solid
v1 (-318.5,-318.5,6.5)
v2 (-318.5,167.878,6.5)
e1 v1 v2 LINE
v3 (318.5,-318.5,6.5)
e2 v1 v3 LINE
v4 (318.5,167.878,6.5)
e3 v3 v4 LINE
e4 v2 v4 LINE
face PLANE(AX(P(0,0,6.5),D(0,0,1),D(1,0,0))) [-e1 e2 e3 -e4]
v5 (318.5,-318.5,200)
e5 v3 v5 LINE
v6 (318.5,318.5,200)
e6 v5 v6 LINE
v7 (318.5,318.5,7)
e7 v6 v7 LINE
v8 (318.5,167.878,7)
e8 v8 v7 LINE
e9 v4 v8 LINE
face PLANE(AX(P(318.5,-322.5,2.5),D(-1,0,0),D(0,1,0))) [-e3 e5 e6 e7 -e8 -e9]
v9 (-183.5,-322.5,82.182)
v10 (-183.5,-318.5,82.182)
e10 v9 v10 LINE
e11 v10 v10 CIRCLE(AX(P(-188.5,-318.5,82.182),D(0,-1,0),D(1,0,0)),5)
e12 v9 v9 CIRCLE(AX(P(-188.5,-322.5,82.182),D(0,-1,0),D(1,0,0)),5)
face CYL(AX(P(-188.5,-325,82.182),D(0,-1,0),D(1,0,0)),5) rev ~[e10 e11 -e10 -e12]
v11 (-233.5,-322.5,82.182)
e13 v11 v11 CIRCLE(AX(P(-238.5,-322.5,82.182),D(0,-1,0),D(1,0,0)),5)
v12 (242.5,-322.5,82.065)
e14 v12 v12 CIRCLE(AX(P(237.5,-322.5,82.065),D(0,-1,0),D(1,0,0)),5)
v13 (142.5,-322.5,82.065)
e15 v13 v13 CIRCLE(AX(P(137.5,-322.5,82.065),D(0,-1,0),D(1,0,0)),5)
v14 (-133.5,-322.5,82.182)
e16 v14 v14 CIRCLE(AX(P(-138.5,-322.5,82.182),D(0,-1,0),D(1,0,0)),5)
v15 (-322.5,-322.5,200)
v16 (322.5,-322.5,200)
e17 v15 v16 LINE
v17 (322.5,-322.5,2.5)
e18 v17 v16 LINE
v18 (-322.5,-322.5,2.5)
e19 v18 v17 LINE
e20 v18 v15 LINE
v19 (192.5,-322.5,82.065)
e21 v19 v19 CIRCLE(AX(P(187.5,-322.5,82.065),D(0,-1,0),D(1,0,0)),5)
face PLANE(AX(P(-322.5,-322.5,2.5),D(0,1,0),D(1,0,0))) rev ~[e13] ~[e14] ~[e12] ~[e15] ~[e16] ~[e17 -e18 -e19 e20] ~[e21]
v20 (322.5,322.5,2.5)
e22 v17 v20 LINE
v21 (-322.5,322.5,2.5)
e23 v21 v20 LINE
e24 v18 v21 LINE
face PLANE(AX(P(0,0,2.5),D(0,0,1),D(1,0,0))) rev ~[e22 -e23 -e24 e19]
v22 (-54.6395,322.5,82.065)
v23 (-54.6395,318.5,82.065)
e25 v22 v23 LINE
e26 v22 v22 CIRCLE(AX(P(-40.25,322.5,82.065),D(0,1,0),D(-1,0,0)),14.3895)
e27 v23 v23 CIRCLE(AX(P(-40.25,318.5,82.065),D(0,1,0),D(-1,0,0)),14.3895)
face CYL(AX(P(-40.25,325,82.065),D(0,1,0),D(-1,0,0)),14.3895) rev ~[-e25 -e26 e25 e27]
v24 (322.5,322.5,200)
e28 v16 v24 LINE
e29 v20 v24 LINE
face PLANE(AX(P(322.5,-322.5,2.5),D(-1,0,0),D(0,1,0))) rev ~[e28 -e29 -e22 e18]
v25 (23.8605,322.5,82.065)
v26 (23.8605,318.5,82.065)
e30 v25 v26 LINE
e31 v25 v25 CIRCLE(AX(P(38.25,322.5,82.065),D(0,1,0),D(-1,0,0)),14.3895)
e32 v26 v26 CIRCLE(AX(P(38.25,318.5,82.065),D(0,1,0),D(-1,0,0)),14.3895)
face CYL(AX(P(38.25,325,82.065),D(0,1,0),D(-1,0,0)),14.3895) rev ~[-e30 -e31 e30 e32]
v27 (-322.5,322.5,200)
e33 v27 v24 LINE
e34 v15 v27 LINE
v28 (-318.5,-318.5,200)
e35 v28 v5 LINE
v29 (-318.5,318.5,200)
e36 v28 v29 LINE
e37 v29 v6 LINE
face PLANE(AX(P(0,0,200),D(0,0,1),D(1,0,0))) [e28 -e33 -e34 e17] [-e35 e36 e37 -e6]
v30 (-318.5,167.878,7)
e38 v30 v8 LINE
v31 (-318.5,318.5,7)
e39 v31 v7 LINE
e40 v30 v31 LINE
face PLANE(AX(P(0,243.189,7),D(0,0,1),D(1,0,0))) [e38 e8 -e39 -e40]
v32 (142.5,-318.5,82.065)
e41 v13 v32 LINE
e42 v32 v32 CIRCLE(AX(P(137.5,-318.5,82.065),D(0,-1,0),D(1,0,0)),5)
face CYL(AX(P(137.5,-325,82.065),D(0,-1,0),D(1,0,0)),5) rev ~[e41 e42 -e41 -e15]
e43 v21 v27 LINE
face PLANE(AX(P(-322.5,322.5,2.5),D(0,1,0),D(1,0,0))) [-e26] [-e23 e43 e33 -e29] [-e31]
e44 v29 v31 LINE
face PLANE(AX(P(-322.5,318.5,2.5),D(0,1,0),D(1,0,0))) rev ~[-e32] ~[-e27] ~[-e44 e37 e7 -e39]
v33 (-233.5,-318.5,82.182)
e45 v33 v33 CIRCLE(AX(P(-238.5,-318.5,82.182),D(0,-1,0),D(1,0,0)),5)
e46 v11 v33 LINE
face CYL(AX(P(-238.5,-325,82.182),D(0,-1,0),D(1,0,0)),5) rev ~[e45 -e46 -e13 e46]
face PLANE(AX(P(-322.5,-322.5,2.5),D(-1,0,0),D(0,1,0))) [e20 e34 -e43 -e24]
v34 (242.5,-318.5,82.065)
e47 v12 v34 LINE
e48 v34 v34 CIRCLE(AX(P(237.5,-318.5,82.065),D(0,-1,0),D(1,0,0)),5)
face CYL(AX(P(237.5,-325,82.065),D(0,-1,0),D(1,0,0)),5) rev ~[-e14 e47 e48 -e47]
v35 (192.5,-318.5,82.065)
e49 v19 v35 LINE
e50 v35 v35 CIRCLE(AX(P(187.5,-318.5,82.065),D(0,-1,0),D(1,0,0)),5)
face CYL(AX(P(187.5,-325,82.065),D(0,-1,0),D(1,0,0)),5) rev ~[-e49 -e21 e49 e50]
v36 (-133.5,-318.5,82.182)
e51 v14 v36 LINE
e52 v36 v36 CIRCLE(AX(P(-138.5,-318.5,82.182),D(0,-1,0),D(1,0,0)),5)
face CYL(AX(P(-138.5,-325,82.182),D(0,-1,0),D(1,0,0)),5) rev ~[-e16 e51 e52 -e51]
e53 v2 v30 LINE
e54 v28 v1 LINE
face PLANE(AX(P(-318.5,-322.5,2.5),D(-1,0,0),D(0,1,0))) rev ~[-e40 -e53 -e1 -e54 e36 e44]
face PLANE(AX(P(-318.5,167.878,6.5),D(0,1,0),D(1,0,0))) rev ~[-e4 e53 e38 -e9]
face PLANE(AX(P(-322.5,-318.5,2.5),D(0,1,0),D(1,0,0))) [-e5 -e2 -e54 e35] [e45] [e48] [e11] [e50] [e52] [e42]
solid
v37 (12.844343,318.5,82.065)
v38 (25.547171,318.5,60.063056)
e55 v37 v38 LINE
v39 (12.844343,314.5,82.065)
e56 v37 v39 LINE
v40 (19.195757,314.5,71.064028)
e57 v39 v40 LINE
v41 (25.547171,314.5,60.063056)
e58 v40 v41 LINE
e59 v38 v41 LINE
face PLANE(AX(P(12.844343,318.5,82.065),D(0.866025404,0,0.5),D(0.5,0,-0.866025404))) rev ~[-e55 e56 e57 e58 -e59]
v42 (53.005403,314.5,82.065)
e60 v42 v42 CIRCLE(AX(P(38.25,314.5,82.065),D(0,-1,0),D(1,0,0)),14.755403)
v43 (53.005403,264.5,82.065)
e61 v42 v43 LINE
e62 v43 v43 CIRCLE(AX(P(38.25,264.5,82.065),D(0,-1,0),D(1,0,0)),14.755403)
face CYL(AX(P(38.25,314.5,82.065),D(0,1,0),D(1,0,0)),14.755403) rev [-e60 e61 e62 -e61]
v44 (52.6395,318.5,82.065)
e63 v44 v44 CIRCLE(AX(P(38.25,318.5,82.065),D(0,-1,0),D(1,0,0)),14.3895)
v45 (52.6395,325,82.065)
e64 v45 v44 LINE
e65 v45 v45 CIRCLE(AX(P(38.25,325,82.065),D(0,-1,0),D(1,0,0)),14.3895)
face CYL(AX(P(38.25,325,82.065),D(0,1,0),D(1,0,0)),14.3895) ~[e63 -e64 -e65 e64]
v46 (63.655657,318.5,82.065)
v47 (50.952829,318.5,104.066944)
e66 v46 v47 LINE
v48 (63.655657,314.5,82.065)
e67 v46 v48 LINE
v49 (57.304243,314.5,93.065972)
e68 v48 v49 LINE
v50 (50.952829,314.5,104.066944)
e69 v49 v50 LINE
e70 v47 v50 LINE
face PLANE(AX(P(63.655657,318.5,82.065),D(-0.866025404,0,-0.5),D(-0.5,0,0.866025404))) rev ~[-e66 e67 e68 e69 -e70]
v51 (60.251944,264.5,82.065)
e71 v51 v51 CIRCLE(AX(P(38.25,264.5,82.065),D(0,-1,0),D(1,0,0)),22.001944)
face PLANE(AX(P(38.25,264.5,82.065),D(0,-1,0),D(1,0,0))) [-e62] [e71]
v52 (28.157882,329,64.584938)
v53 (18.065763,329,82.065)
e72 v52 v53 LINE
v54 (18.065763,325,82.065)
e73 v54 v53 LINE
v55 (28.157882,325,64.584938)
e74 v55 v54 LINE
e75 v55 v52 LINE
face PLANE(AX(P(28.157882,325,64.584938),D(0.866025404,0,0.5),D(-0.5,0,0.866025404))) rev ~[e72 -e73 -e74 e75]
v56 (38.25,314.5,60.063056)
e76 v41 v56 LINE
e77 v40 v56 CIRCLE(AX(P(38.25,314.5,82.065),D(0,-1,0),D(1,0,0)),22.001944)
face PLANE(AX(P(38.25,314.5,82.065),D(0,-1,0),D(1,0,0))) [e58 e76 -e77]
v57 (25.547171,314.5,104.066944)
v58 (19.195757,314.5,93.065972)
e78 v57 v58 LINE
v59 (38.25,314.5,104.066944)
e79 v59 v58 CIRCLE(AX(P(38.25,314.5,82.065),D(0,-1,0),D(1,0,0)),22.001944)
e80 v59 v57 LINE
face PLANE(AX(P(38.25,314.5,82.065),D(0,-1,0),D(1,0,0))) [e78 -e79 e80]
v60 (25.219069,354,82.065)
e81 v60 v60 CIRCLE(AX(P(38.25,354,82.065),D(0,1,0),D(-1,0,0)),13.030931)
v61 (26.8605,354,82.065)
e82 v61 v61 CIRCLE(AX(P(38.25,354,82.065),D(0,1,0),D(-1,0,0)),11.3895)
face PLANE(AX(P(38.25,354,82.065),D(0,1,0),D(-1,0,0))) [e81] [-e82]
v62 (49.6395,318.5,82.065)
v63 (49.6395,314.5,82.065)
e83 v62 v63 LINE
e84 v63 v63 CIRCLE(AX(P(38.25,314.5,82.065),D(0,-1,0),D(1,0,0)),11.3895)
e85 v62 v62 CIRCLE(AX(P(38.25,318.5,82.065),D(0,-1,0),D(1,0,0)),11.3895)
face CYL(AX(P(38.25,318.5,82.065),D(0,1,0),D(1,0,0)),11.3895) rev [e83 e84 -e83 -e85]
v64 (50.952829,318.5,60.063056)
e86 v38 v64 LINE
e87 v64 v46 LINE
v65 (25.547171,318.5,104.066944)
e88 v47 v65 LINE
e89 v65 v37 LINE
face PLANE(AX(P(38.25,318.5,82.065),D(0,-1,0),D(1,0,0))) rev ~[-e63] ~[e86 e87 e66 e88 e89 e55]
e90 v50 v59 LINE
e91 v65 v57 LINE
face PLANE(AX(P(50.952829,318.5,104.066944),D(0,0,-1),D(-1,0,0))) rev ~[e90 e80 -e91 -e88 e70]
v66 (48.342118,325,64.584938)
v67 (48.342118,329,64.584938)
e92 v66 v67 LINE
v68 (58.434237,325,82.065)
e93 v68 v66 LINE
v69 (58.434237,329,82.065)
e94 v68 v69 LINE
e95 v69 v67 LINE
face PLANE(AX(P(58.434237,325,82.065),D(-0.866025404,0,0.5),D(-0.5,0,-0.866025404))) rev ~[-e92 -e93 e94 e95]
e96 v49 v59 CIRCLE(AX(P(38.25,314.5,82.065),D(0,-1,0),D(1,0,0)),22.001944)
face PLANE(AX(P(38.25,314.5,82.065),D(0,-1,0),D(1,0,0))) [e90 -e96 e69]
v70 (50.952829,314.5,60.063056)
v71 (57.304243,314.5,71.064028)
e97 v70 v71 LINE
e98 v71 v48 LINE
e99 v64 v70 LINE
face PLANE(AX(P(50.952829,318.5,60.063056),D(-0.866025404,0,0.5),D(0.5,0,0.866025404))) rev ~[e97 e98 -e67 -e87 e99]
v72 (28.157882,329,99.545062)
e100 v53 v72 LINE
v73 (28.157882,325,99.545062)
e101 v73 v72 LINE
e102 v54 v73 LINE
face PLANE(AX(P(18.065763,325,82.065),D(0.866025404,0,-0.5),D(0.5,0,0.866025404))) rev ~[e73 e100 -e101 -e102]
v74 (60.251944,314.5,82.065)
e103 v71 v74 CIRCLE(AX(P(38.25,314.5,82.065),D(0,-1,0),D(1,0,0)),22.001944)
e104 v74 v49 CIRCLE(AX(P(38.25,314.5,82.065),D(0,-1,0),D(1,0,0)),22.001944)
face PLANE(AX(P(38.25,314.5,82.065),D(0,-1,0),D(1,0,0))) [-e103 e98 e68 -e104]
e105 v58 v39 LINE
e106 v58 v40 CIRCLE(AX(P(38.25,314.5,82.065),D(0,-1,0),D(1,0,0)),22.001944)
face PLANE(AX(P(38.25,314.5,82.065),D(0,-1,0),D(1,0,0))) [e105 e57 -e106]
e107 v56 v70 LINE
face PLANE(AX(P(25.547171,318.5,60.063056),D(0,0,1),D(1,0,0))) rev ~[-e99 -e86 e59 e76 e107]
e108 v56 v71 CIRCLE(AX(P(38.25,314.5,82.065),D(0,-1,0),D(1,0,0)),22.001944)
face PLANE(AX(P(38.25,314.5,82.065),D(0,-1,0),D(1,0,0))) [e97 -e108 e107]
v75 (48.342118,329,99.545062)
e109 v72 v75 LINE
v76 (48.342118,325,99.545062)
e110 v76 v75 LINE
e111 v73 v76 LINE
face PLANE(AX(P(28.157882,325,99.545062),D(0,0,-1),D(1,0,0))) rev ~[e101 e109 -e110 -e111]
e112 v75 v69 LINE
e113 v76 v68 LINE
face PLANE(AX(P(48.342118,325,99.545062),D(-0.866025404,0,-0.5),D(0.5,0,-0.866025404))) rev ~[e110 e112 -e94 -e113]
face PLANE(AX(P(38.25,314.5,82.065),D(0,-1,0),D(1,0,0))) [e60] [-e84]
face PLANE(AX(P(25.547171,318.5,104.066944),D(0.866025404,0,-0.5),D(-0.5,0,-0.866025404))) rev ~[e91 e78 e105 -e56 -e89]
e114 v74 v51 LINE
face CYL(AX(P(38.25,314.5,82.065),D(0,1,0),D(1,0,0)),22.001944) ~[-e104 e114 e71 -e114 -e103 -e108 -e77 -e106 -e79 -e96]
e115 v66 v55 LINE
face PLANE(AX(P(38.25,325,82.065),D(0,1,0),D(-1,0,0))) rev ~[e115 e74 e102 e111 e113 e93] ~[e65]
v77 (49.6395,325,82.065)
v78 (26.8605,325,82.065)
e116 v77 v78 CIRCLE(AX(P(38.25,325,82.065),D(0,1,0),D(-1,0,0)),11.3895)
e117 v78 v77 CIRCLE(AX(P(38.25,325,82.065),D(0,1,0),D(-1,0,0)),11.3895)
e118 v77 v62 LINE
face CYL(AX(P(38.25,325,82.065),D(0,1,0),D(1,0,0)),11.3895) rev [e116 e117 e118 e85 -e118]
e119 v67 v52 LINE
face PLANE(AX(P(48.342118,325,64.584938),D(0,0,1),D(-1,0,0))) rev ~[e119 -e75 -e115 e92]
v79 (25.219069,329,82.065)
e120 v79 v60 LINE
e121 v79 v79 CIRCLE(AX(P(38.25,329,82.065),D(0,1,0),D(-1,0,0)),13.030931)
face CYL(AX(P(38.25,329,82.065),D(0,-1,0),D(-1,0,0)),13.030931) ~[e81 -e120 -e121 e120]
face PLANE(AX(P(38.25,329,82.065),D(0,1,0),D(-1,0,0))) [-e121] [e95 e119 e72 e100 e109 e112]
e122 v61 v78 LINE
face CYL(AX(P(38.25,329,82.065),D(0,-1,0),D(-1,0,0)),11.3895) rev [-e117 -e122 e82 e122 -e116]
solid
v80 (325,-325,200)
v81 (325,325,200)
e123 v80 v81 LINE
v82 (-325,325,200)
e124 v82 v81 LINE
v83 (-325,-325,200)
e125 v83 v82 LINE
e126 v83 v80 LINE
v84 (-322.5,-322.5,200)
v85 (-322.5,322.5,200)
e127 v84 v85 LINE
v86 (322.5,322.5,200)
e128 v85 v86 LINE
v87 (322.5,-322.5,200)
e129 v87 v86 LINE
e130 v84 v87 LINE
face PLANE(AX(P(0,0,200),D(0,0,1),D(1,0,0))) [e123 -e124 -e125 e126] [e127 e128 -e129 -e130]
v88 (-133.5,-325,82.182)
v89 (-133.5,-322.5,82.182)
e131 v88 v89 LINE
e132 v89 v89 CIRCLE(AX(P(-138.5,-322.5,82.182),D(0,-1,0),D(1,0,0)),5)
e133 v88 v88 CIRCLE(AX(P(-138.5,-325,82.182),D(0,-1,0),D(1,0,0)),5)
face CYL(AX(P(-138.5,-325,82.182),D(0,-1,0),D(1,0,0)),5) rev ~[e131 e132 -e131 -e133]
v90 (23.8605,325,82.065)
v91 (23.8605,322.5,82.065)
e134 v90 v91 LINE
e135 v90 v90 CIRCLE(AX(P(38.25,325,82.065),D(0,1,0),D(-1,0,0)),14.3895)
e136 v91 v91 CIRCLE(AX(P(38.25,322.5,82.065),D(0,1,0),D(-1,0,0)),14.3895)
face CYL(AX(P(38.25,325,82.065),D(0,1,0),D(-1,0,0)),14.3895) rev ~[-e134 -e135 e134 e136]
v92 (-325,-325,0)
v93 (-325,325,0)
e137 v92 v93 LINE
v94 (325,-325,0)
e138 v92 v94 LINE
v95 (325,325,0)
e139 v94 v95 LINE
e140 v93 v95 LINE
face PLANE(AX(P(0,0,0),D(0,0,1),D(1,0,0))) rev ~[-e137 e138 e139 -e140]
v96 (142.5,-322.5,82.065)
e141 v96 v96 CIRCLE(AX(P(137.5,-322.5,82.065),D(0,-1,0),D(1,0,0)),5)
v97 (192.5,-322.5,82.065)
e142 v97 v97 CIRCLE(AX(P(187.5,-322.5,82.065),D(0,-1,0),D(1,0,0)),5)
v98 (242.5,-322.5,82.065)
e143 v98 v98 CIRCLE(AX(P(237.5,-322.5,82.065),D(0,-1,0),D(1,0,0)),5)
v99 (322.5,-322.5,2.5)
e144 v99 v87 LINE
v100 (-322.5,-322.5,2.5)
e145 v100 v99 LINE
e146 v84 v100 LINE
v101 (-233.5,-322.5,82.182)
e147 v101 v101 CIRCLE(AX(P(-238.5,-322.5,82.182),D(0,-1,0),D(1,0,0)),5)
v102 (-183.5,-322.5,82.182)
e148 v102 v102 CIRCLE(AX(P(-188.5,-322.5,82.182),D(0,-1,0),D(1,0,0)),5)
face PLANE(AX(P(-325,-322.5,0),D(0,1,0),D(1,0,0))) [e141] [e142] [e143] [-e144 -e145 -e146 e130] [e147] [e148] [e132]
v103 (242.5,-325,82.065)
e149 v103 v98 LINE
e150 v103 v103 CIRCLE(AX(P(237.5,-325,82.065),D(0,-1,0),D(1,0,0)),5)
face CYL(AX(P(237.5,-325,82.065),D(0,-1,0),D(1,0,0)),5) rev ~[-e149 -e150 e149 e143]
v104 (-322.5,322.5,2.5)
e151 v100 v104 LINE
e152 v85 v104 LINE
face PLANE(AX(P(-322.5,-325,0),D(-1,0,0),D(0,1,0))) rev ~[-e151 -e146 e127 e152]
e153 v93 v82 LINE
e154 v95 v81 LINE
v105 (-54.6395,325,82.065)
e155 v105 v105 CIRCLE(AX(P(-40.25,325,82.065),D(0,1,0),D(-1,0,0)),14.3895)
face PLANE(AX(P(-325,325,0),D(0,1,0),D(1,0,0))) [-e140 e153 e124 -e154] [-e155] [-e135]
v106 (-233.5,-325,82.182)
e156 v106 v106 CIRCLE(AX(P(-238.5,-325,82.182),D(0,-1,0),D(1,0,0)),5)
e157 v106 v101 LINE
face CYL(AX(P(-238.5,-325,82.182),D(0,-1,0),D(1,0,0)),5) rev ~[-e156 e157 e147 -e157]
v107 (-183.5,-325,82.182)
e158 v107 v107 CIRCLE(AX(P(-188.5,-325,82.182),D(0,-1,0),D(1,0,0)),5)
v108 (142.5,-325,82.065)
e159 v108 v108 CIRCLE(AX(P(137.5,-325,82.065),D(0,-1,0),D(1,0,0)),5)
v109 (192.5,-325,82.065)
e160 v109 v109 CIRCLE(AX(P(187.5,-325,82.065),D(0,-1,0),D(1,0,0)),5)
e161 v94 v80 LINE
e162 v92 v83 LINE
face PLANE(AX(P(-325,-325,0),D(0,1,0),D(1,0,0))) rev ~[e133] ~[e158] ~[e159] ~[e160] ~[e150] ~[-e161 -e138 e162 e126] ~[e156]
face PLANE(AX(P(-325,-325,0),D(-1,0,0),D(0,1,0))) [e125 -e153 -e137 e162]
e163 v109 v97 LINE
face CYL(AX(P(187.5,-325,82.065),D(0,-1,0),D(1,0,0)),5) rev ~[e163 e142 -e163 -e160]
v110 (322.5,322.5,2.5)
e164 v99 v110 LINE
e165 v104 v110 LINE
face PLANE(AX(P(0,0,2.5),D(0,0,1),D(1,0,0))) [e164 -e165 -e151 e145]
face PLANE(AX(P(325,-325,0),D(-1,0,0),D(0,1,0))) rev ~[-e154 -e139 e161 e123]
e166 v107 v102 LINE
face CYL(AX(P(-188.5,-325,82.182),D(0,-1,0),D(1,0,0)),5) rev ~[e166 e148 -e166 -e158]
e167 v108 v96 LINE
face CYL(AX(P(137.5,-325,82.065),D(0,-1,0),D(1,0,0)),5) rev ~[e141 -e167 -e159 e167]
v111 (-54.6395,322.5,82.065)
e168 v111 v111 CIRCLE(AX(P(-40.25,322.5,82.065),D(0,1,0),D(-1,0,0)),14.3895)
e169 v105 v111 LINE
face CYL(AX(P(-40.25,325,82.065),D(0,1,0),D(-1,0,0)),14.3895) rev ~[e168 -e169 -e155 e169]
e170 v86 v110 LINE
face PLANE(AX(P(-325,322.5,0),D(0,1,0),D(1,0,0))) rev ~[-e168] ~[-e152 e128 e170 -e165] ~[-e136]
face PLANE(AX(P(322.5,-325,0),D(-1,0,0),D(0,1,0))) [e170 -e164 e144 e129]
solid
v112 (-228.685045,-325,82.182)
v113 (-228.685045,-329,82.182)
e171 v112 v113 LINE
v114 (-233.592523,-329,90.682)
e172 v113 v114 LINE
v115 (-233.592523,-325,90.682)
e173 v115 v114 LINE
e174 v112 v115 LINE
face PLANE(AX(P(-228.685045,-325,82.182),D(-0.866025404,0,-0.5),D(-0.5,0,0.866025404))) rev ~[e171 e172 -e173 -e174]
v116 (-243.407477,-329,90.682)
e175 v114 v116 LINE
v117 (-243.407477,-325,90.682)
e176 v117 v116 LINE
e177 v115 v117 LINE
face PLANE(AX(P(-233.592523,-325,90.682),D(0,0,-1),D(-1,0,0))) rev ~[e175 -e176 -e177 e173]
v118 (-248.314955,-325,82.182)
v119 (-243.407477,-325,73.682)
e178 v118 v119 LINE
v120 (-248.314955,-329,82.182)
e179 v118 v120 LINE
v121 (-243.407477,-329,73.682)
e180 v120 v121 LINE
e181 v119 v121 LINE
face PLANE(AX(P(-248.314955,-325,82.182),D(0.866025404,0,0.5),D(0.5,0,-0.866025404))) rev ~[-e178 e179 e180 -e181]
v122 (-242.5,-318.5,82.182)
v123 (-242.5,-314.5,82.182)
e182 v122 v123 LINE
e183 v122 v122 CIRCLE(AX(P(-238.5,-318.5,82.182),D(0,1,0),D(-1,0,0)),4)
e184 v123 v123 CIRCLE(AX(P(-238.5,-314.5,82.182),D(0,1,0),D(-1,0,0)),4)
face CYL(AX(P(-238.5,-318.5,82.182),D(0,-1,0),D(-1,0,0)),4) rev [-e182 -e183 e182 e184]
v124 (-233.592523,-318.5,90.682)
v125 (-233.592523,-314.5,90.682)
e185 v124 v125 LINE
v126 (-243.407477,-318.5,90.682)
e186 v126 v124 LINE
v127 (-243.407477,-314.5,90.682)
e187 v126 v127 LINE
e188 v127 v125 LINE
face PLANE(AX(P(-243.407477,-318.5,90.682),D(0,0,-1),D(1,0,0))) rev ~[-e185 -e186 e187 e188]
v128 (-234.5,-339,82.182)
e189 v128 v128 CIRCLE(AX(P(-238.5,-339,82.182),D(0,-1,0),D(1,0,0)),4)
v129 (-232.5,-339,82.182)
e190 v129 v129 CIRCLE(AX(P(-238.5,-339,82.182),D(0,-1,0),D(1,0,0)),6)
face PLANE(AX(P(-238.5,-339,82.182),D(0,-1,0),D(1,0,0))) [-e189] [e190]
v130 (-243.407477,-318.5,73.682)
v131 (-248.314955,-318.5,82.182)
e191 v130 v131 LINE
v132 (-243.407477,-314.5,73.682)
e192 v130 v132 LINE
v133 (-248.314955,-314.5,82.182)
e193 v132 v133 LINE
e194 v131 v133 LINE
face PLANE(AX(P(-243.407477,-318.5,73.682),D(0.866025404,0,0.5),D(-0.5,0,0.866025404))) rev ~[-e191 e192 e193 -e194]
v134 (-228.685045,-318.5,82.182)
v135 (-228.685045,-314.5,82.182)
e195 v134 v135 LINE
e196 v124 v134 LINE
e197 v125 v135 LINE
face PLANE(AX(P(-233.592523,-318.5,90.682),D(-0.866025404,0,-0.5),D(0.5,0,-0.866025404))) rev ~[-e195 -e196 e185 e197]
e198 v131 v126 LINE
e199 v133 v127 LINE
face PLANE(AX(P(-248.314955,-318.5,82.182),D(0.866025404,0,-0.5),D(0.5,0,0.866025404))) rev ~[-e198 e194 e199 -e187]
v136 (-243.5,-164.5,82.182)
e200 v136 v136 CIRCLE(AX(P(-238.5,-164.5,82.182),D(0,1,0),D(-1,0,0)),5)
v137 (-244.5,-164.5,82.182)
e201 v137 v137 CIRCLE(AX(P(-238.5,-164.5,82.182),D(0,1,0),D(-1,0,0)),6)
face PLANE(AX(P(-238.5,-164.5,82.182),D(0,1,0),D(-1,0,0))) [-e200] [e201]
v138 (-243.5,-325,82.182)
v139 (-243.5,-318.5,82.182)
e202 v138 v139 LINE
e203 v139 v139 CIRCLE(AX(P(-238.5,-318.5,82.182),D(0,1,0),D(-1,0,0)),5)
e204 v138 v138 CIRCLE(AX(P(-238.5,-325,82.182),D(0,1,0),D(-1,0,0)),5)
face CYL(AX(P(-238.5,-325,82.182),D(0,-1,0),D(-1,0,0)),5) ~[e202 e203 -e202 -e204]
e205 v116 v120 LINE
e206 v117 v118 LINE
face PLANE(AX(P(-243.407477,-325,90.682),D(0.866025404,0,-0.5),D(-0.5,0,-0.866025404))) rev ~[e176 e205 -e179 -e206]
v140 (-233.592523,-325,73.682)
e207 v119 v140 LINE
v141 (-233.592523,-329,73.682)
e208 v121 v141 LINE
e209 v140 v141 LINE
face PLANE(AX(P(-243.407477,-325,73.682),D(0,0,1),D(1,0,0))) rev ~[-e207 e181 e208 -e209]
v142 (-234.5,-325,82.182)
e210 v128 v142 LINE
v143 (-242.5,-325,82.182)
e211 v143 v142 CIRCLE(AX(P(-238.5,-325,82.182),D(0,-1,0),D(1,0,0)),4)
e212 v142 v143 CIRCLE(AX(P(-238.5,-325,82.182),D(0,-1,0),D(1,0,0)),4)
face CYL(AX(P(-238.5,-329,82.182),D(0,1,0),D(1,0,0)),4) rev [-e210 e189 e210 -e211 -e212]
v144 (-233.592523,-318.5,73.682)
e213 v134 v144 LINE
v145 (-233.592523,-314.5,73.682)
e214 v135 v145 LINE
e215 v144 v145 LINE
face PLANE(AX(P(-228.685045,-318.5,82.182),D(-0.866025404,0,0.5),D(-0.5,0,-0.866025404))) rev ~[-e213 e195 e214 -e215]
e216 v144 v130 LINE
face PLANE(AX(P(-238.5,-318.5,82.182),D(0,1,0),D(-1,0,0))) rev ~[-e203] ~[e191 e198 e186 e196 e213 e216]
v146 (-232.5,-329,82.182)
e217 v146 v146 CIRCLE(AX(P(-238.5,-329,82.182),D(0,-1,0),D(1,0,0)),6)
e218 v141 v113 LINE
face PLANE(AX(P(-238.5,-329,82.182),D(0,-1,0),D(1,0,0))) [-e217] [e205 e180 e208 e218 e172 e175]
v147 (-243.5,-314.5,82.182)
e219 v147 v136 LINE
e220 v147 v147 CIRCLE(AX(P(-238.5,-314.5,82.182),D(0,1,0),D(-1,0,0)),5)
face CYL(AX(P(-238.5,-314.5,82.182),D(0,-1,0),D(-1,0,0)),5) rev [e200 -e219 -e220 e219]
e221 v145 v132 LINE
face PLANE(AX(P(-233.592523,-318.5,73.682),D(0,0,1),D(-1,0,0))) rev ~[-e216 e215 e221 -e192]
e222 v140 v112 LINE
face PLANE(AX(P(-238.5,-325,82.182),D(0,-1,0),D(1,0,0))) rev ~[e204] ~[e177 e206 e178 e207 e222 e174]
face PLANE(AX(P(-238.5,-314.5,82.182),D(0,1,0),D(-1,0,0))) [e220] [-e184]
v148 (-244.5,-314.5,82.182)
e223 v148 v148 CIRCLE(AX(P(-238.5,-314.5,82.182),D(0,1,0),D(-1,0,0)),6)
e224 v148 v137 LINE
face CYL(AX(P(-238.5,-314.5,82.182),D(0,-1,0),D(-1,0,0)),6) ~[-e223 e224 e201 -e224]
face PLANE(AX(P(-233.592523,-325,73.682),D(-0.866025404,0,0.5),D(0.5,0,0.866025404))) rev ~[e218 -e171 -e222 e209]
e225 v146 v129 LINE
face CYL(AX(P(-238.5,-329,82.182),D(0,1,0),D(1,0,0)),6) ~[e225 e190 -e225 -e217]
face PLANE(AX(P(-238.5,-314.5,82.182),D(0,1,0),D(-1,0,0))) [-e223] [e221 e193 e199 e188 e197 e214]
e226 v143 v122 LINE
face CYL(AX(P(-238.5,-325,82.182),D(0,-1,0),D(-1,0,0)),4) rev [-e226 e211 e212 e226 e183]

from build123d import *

# Parameters (mm, degrees)
F0_W      = 650
F0_H      = 650
F1_DEPTH  = 200
F2_T      = -2.5
F3_DEPTH  = 197.5
F4_T      = -4
F5_W      = 637
F5_H      = 150.622
F6_DEPTH  = 0.5
F7_R      = 5
F8_DEPTH  = 25
F9_R      = 14.3895
F10_DEPTH = 15
F11_R     = 4
F12_DEPTH = 4
F13_R     = 6
F13_R_2   = 4
F14_DEPTH = 10
F15_R     = 5
F15_R_2   = 4
F16_DEPTH = 6.5
F17_R     = 5
F17_R_2   = 4
F18_DEPTH = 4
F19_R     = 6
F19_R_2   = 5
F20_DEPTH = 150
F21_R     = 11.3895
F22_DEPTH = 4
F23_R     = 13.0309314184
F23_R_2   = 11.3895
F24_DEPTH = 25
F25_R     = 14.3895
F25_R_2   = 11.3895
F26_DEPTH = 6.5
F27_R     = 11.3895
F28_DEPTH = 4
F29_R     = 22.0019443752
F29_R_2   = 14.7554030698
F30_DEPTH = 50


# Not quite as in the source:
# - a feature names something its author has since deleted; it is built from what else it names


with BuildPart() as f1:
    # F0 (on Top) → F1 (new body)
    with BuildSketch(Plane.XY):
        Rectangle(F0_W, F0_H)
    extrude(amount=F1_DEPTH)

    # F2
    f2_openings = [f1.faces().sort_by_distance(p)[0] for p in [
        (0, 0, 200),
    ]]
    offset(amount=F2_T, openings=f2_openings)


with BuildPart() as f3:
    # F3 (new): a face of the model
    f3_faces = [f1.part.faces().sort_by_distance(p)[0] for p in [
        (0, 0, 2.5),
    ]]
    extrude(f3_faces, amount=F3_DEPTH)

    # F4
    f4_openings = [f3.faces().sort_by_distance(p)[0] for p in [
        (0, 0, 200),
    ]]
    offset(amount=F4_T, openings=f4_openings)

    # F5 (on face) → F6 (join)
    with BuildSketch(Plane.XY.offset(6.5)):
        with Locations((0, 243.189)):
            Rectangle(F5_W, F5_H)
    extrude(amount=F6_DEPTH)


with BuildPart() as f8_tool:
    # F7 (on face) → F8 (new body)
    with BuildSketch(Plane.XZ.offset(325)):
        with Locations((-238.5, 82.182)):
            Circle(F7_R)
        with Locations((-188.5, 82.182)):
            Circle(F7_R)
        with Locations((-138.5, 82.182)):
            Circle(F7_R)
        with Locations((237.5, 82.065)):
            Circle(F7_R)
        with Locations((187.5, 82.065)):
            Circle(F7_R)
        with Locations((137.5, 82.065)):
            Circle(F7_R)
    extrude(amount=-F8_DEPTH)


with BuildPart() as f1_1:
    add(f1.part)

    # F8: cut by f8_tool
    add(f8_tool.part, mode=Mode.SUBTRACT)


with BuildPart() as f3_1:
    add(f3.part)

    # F8: cut by f8_tool
    add(f8_tool.part, mode=Mode.SUBTRACT)


with BuildPart() as f10_tool:
    # F9 (on face) → F10 (new body)
    with BuildSketch(Plane(origin=(0, 325, 0), x_dir=(-1, 0, 0), z_dir=(0, 1, 0))):
        with Locations((40.25, 82.065)):
            Circle(F9_R)
        with Locations((-38.25, 82.065)):
            Circle(F9_R)
    extrude(amount=-F10_DEPTH)


with BuildPart() as f1_2:
    add(f1_1.part)

    # F10: cut by f10_tool
    add(f10_tool.part, mode=Mode.SUBTRACT)


with BuildPart() as f3_2:
    add(f3_1.part)

    # F10: cut by f10_tool
    add(f10_tool.part, mode=Mode.SUBTRACT)


with BuildPart() as f12:
    # F11 (on face) → F12 (new body)
    with BuildSketch(Plane.XZ.offset(325)):
        Polygon((-233.5925227119, 90.682), (-243.4074772881, 90.682), (-248.3149545762, 82.182), (-243.4074772881, 73.682), (-233.5925227119, 73.682), (-228.6850454238, 82.182), align=None)
        with Locations((-238.5, 82.182)):
            Circle(F11_R, mode=Mode.SUBTRACT)
    extrude(amount=F12_DEPTH)

    # F13 (on face) → F14 (join)
    with BuildSketch(Plane.XZ.offset(329)):
        with Locations((-238.5, 82.182)):
            Circle(F13_R)
        with Locations((-238.5, 82.182)):
            Circle(F13_R_2, mode=Mode.SUBTRACT)
    extrude(amount=F14_DEPTH)

    # F15 (on face) → F16 (join)
    with BuildSketch(Plane(origin=(0, -325, 0), x_dir=(-1, 0, 0), z_dir=(0, 1, 0))):
        with Locations((238.5, 82.182)):
            Circle(F15_R)
        with Locations((238.5, 82.182)):
            Circle(F15_R_2, mode=Mode.SUBTRACT)
    extrude(amount=F16_DEPTH)

    # F17 (on face) → F18 (join)
    with BuildSketch(Plane(origin=(0, -318.5, 0), x_dir=(-1, 0, 0), z_dir=(0, 1, 0))):
        Polygon((243.4074772881, 90.682), (233.5925227119, 90.682), (228.6850454238, 82.182), (233.5925227119, 73.682), (243.4074772881, 73.682), (248.3149545762, 82.182), align=None)
        with Locations((238.5, 82.182)):
            Circle(F17_R, mode=Mode.SUBTRACT)
        with Locations((238.5, 82.182)):
            Circle(F17_R)
        with Locations((238.5, 82.182)):
            Circle(F17_R_2, mode=Mode.SUBTRACT)
    extrude(amount=F18_DEPTH)

    # F19 (on face) → F20 (join)
    with BuildSketch(Plane(origin=(0, -314.5, 0), x_dir=(-1, 0, 0), z_dir=(0, 1, 0))):
        with Locations((238.5, 82.182)):
            Circle(F19_R)
        with Locations((238.5, 82.182)):
            Circle(F19_R_2, mode=Mode.SUBTRACT)
    extrude(amount=F20_DEPTH)


with BuildPart() as f22:
    # F21 (on face) → F22 (new body)
    with BuildSketch(Plane(origin=(0, 325, 0), x_dir=(-1, 0, 0), z_dir=(0, 1, 0))):
        Polygon((-28.1578817366, 99.5450615883), (-48.3421182634, 99.5450615883), (-58.4342365269, 82.065), (-48.3421182634, 64.5849384117), (-28.1578817366, 64.5849384117), (-18.0657634731, 82.065), align=None)
        with Locations((-38.25, 82.065)):
            Circle(F21_R, mode=Mode.SUBTRACT)
    extrude(amount=F22_DEPTH)

    # F23 (on face) → F24 (join)
    with BuildSketch(Plane(origin=(0, 329, 0), x_dir=(-1, 0, 0), z_dir=(0, 1, 0))):
        with Locations((-38.25, 82.065)):
            Circle(F23_R)
        with Locations((-38.25, 82.065)):
            Circle(F23_R_2, mode=Mode.SUBTRACT)
    extrude(amount=F24_DEPTH)

    # F25 (on face) → F26 (join)
    with BuildSketch(Plane.XZ.offset(-325)):
        with Locations((38.25, 82.065)):
            Circle(F25_R)
        with Locations((38.25, 82.065)):
            Circle(F25_R_2, mode=Mode.SUBTRACT)
    extrude(amount=F26_DEPTH)

    # F27 (on face) → F28 (join)
    with BuildSketch(Plane.XZ.offset(-318.5)):
        Polygon((50.9528285077, 104.0669443752), (25.5471714923, 104.0669443752), (12.8443429845, 82.065), (25.5471714923, 60.0630556248), (50.9528285077, 60.0630556248), (63.6556570155, 82.065), align=None)
        with Locations((38.25, 82.065)):
            Circle(F27_R, mode=Mode.SUBTRACT)
    extrude(amount=F28_DEPTH)

    # F29 (on face) → F30 (join)
    with BuildSketch(Plane.XZ.offset(-314.5)):
        with Locations((38.25, 82.065)):
            Circle(F29_R)
        with Locations((38.25, 82.065)):
            Circle(F29_R_2, mode=Mode.SUBTRACT)
    extrude(amount=F30_DEPTH)


solid = Compound([f1_2.part, f3_2.part, f12.part, f22.part])
